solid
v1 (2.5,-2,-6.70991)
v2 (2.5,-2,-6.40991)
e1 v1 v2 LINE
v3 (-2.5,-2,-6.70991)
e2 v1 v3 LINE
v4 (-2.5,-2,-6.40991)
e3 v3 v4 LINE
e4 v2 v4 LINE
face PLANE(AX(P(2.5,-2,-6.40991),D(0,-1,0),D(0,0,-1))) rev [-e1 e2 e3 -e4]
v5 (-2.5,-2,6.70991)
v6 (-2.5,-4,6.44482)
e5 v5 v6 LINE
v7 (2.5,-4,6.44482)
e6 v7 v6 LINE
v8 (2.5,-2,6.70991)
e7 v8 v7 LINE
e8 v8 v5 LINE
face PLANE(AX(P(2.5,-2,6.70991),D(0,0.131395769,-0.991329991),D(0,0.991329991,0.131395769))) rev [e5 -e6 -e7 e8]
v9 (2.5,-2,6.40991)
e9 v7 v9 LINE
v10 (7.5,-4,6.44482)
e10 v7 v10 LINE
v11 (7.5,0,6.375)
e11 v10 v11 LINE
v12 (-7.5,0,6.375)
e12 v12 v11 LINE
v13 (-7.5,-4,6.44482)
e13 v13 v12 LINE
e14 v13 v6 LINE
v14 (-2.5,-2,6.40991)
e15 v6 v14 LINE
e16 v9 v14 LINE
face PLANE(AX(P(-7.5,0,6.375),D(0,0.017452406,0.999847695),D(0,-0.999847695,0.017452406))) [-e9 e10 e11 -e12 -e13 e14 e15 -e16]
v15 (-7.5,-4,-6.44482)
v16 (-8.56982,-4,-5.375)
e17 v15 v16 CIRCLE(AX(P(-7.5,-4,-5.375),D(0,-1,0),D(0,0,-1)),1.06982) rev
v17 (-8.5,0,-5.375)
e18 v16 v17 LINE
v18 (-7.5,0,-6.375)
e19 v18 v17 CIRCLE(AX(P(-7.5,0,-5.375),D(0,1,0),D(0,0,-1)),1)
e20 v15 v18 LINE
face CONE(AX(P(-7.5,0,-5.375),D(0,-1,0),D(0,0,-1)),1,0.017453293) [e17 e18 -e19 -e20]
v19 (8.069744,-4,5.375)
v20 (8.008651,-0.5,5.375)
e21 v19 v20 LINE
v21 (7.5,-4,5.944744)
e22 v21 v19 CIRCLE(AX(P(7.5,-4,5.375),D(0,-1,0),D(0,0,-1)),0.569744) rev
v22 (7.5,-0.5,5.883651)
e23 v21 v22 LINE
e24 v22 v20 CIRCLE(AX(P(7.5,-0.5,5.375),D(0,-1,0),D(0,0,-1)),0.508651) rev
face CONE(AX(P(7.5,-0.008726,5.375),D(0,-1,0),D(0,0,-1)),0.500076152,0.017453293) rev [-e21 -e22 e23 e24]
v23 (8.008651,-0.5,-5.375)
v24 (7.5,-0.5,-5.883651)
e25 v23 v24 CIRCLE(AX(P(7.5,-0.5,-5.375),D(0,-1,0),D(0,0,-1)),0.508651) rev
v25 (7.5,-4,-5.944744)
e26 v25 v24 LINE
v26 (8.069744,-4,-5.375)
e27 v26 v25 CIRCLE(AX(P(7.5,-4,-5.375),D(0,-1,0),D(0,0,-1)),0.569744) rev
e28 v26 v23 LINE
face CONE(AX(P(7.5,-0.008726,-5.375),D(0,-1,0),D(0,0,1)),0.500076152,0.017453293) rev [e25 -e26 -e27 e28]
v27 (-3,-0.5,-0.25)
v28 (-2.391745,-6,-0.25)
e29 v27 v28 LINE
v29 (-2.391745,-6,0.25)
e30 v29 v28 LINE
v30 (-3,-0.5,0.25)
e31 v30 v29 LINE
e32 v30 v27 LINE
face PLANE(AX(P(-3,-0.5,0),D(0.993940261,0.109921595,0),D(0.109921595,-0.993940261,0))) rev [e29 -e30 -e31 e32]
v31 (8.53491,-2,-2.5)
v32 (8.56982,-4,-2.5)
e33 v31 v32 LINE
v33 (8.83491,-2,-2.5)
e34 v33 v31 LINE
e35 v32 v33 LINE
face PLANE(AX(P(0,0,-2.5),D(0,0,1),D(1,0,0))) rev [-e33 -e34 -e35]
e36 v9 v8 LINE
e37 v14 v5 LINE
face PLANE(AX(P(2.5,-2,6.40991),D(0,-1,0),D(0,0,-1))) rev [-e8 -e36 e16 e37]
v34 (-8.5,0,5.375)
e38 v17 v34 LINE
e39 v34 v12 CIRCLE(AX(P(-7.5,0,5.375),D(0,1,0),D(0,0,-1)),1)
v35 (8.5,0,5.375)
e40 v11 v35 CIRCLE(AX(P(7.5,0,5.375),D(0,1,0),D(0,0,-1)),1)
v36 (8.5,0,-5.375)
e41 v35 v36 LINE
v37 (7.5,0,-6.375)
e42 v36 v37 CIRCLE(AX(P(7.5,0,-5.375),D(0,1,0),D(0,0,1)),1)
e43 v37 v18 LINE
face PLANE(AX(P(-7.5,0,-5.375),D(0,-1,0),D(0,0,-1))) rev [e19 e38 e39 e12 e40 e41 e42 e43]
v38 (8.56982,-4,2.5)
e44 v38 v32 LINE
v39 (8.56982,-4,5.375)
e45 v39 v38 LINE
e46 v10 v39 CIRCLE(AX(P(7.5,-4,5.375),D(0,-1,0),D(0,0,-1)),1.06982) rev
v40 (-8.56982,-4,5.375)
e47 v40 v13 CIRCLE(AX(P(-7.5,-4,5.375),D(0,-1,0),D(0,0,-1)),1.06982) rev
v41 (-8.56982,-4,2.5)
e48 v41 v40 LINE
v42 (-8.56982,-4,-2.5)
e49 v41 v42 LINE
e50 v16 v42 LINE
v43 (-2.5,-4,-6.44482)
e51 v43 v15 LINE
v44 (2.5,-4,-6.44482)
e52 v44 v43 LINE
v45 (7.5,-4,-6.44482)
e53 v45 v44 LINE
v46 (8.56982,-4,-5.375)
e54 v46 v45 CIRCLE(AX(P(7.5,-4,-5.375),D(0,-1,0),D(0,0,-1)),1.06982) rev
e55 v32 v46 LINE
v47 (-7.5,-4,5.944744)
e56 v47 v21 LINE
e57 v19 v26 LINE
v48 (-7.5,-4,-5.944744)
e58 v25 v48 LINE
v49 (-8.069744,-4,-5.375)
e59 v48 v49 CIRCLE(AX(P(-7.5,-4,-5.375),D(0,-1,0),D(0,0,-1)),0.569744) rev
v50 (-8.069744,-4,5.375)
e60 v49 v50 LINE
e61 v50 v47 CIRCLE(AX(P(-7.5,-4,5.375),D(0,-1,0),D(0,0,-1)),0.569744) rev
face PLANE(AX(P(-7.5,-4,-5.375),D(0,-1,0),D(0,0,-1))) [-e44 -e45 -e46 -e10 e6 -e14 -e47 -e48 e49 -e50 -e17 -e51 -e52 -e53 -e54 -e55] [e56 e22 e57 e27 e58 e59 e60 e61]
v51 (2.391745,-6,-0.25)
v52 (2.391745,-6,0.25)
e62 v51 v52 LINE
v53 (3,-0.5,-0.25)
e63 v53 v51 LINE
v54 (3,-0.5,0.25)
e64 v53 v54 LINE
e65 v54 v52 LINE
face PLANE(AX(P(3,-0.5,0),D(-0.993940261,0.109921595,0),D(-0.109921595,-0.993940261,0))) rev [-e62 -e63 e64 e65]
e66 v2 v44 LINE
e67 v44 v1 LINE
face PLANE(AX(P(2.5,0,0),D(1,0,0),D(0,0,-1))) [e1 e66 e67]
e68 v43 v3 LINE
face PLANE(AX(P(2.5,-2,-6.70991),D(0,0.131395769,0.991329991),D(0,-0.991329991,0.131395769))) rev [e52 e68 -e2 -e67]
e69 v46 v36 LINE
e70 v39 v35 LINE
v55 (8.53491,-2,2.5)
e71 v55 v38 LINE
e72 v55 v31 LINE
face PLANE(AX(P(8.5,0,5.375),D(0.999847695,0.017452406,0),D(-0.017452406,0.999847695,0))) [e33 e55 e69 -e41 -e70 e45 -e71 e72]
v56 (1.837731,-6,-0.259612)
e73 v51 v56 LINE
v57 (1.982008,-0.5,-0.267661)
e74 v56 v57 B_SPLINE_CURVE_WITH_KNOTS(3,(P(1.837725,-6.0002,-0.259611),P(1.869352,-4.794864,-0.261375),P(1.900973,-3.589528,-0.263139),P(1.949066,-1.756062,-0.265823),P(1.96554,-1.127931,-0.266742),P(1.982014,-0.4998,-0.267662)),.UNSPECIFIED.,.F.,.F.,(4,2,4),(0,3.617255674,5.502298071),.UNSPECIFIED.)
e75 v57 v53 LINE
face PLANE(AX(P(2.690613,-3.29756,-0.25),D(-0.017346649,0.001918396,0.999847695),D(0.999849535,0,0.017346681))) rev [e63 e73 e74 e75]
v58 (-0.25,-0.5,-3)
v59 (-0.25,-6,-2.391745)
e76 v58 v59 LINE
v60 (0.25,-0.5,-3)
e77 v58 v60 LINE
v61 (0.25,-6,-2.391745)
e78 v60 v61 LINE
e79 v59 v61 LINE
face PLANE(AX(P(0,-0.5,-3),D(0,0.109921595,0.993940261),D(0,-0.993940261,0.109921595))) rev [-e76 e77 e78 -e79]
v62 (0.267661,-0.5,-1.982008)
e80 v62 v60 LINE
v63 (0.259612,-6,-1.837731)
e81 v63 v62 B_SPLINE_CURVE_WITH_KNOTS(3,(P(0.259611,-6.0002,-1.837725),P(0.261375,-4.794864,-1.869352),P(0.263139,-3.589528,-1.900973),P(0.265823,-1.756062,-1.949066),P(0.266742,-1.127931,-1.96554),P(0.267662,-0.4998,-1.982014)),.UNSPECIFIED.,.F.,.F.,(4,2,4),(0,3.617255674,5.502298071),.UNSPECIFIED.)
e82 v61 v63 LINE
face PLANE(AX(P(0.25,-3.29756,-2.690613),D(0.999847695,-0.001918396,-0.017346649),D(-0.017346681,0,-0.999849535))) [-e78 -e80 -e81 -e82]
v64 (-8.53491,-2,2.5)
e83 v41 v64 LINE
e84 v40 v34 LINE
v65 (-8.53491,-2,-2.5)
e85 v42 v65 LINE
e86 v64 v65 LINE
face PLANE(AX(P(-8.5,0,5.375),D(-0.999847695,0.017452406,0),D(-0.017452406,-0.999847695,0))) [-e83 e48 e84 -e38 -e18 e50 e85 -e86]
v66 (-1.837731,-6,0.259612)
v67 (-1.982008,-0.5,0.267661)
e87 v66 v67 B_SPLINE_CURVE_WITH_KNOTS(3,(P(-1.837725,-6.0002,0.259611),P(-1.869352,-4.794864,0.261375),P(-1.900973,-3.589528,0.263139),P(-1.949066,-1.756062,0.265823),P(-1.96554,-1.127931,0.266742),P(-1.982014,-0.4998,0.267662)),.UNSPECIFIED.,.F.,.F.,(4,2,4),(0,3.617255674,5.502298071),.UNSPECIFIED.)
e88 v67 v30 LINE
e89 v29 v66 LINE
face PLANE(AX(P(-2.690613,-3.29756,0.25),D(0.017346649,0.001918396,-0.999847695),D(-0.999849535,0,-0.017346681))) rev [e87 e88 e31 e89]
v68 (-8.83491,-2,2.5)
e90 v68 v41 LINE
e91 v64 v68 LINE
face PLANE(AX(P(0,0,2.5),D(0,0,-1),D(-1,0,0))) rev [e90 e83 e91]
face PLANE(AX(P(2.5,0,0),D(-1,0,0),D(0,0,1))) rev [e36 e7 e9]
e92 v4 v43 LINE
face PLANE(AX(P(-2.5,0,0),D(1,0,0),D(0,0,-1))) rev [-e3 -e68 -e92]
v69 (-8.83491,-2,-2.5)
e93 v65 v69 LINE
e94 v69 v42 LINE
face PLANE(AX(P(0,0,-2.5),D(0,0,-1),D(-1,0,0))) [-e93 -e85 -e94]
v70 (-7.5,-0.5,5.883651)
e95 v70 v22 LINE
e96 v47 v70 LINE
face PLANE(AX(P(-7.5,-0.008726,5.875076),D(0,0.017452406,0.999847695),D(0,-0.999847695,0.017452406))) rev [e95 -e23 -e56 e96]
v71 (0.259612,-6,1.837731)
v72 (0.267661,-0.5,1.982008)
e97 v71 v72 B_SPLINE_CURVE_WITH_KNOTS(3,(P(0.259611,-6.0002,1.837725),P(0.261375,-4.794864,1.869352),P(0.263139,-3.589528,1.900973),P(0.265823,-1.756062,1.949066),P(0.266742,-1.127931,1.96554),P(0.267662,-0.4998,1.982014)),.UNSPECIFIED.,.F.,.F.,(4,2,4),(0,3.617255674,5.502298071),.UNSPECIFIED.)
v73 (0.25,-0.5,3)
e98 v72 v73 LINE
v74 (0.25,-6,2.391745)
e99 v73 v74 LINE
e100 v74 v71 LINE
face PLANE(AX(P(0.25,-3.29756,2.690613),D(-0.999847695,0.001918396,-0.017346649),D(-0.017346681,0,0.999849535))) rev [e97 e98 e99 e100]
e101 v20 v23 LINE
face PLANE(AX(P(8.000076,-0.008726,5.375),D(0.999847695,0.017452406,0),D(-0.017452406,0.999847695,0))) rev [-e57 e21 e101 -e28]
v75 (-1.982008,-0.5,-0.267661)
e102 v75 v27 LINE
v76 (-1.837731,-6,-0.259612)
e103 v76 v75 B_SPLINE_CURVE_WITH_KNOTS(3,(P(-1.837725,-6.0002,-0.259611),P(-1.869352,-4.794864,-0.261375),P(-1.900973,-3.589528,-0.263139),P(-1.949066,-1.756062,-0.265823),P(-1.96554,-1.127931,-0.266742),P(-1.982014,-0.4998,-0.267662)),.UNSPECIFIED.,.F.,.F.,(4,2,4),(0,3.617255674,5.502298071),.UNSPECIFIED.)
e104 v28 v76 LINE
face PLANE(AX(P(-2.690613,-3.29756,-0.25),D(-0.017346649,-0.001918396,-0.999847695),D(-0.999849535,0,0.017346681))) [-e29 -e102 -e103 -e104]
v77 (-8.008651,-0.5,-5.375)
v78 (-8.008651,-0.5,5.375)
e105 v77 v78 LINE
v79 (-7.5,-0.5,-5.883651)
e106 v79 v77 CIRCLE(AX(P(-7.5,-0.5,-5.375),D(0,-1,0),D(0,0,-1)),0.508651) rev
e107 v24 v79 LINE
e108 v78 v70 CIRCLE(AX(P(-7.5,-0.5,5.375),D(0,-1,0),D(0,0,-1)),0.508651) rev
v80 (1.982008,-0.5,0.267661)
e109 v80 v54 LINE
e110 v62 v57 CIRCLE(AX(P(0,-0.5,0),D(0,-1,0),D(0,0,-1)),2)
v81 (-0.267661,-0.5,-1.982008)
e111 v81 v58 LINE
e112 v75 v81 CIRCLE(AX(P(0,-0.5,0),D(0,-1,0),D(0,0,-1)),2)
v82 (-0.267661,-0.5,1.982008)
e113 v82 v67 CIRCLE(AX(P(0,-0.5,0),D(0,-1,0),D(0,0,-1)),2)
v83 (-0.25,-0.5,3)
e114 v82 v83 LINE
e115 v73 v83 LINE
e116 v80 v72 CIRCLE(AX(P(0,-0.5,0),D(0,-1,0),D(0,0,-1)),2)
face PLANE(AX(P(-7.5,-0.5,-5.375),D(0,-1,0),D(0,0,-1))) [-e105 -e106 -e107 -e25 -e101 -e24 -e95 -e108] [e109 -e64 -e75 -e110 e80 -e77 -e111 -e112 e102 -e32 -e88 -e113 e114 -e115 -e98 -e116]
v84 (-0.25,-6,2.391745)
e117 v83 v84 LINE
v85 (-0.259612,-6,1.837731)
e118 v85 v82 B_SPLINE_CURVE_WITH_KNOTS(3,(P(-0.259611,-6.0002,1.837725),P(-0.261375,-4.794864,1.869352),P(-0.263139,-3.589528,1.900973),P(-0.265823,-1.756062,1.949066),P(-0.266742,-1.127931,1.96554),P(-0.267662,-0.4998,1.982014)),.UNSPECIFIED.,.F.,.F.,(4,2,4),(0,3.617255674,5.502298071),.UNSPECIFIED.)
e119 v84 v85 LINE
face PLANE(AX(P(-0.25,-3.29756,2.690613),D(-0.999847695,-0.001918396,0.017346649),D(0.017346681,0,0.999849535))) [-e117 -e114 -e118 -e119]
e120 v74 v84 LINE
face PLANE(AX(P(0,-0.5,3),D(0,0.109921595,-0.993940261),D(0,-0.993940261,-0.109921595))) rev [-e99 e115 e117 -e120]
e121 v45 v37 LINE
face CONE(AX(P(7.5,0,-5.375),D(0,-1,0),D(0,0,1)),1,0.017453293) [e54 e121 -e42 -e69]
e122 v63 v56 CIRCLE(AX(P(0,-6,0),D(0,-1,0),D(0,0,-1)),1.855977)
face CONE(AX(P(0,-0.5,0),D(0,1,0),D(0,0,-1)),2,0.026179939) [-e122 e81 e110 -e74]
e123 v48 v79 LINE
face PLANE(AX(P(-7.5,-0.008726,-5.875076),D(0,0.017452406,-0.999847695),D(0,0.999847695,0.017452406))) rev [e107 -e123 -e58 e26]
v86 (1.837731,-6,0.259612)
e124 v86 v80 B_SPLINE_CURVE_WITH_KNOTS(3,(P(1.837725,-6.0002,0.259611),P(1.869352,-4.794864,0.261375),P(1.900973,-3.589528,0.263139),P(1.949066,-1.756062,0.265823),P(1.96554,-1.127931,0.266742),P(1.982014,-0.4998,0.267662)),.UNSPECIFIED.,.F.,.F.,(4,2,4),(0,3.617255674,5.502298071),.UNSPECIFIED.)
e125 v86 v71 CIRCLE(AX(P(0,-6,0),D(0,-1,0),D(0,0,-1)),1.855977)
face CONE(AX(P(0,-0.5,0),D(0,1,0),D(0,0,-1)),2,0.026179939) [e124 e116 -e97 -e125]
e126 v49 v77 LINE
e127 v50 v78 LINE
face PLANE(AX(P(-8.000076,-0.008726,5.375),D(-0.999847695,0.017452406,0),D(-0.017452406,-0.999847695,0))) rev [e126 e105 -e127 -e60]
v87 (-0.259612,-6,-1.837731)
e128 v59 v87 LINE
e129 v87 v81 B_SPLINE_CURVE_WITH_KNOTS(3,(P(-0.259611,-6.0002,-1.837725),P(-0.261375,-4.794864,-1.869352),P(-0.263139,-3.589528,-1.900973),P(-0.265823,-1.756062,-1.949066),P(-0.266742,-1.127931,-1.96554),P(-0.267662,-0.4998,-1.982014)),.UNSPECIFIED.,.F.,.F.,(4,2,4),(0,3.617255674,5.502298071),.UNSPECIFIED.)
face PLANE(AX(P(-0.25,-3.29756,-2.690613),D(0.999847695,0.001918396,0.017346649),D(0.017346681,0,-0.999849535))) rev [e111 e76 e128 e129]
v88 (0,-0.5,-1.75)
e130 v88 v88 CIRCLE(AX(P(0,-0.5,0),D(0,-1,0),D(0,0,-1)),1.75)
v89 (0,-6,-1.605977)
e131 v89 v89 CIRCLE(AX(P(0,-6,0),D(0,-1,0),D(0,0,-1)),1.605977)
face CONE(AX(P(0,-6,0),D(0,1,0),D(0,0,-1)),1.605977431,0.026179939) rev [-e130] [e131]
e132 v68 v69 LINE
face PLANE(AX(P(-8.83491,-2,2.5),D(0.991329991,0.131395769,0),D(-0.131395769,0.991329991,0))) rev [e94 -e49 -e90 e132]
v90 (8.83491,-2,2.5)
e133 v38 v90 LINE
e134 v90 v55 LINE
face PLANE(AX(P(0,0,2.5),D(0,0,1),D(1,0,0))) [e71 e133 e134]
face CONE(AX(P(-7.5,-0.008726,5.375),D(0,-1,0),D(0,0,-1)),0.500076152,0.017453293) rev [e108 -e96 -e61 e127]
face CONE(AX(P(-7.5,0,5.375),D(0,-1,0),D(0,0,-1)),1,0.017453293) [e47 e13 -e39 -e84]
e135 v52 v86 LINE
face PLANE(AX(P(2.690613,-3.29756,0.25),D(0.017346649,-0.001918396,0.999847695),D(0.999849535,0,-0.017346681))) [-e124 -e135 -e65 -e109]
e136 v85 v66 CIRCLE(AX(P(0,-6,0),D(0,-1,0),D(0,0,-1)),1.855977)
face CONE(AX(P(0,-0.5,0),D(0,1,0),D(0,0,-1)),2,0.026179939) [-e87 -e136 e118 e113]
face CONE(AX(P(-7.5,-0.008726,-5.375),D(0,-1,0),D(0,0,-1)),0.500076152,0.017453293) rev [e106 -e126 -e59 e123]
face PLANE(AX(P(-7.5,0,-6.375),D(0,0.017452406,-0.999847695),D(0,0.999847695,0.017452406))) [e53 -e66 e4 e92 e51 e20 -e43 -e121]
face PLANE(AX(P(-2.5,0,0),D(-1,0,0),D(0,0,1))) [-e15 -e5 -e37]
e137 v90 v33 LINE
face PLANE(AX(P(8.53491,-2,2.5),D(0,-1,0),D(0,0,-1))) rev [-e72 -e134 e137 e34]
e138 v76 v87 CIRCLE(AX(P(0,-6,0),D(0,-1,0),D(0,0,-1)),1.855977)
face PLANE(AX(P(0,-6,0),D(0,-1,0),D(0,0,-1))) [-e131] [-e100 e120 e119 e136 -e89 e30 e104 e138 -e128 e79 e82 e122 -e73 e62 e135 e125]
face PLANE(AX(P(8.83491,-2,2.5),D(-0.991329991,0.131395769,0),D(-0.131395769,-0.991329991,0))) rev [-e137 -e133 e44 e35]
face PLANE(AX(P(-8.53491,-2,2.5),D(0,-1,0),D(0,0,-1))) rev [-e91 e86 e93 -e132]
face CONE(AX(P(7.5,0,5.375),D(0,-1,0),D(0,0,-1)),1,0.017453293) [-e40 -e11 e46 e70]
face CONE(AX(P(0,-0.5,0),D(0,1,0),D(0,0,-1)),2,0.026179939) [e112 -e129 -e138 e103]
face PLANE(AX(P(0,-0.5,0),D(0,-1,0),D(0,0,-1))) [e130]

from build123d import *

# Parameters (mm, degrees)
BOSS_EXTRUDE1_DEPTH = 4
BOSS_EXTRUDE1_DRAFT = 1
SHELL1_T            = -0.5
SKETCH2_R           = 2
BOSS_EXTRUDE2_DEPTH = 5.5
BOSS_EXTRUDE2_TAPER = 1.5
CIRPATTERN1_COUNT   = 4
SKETCH4_R           = 1.605977431
CUT_EXTRUDE1_DEPTH  = 5.5
CUT_EXTRUDE1_DRAFT  = 1.5
BOSS_EXTRUDE3_DEPTH = 2.5
BOSS_EXTRUDE4_DEPTH = 2.5


with BuildPart() as part:
    # Sketch1 → Boss-Extrude1 (with draft: the straight prism first)
    with BuildSketch(Plane(origin=(0, 0, 0), x_dir=(1, 0, 0), z_dir=(0, 1, 0))):
        with BuildLine():
            Line((-7.5, -6.375), (7.5, -6.375))
            ThreePointArc((7.5, -6.375), (8.207106781, -6.082106781), (8.5, -5.375))
            Line((8.5, -5.375), (8.5, 5.375))
            ThreePointArc((8.5, 5.375), (8.207106781, 6.082106781), (7.5, 6.375))
            Line((7.5, 6.375), (-7.5, 6.375))
            ThreePointArc((-7.5, 6.375), (-8.207106781, 6.082106781), (-8.5, 5.375))
            Line((-8.5, 5.375), (-8.5, -5.375))
            ThreePointArc((-8.5, -5.375), (-8.207106781, -6.082106781), (-7.5, -6.375))
        make_face()
    extrude(amount=-BOSS_EXTRUDE1_DEPTH)
    # Boss-Extrude1: the draft: its side faces are tilted about the plane it starts from
    boss_extrude1_sides = [part.faces().sort_by_distance(p)[0] for p in [
        (0, -2, 6.375),
        (8.207106781, -2, 6.082106781),
        (8.5, -2, 0),
        (8.207106781, -2, -6.082106781),
        (0, -2, -6.375),
        (-8.207106781, -2, -6.082106781),
        (-8.5, -2, 0),
        (-8.207106781, -2, 6.082106781),
    ]]
    draft(boss_extrude1_sides, Plane(origin=(0, 0, 0), x_dir=(1, 0, 0), z_dir=(0, 1, 0)), BOSS_EXTRUDE1_DRAFT)

    # Shell1
    shell1_openings = [part.faces().sort_by_distance(p)[0] for p in [
        (0, -4, 0),
    ]]
    offset(amount=SHELL1_T, openings=shell1_openings, kind=Kind.INTERSECTION)

    # Sketch2 → Boss-Extrude2 (add)
    with BuildSketch(Plane.XZ.offset(0.5)):
        Circle(SKETCH2_R)
    extrude(amount=BOSS_EXTRUDE2_DEPTH, taper=BOSS_EXTRUDE2_TAPER)

    # Rib1: read off the stored shape, not the designer's step
    # Rib1: loft between two sections, ruled curve by curve
    rib1_from = [
        Edge.make_line((1.982008415, -0.5, 0.267661433), (3, -0.5, 0.25)),
        Edge.make_line((1.982008415, -0.5, -0.267661433), (3, -0.5, -0.25)),
        Edge.make_line((3, -0.5, -0.25), (3, -0.5, 0.25)),
        Edge.make_line((1.982008415, -0.5, -0.267661433), (1.982008415, -0.5, 0.267661433)),
    ]
    rib1_to = [
        Edge.make_line((1.837730654, -6, 0.259611763), (2.391745366, -6, 0.25)),
        Edge.make_line((1.837730654, -6, -0.259611763), (2.391745366, -6, -0.25)),
        Edge.make_line((2.391745366, -6, -0.25), (2.391745366, -6, 0.25)),
        Edge.make_line((1.837730654, -6, -0.259611763), (1.837730654, -6, 0.259611763)),
    ]
    rib1 = Solid(Shell([*[Face.make_surface_from_curves(rib1_from[k], rib1_to[k]) for k in range(4)], Face(Wire(rib1_from)), Face(Wire(rib1_to))]))
    add(rib1)

    # CirPattern1: Rib1 ×4 about axis
    cirpattern1_axis = Axis((0, 0, 0), (0, 1, 0))
    for i in range(1, CIRPATTERN1_COUNT):
        add(rib1.rotate(cirpattern1_axis, i * 360 / CIRPATTERN1_COUNT))


with BuildPart() as cut_extrude1_tool:
    # Sketch4 → Cut-Extrude1 (with draft: the straight prism first)
    with BuildSketch(Plane.XZ.offset(6)):
        Circle(SKETCH4_R)
    extrude(amount=-CUT_EXTRUDE1_DEPTH)
    # Cut-Extrude1: the draft: its side faces are tilted about the plane it starts from
    cut_extrude1_sides = [cut_extrude1_tool.faces().sort_by_distance(p)[0] for p in [
        (-1.605977431, -3.25, 0),
    ]]
    draft(cut_extrude1_sides, Plane.XZ.offset(6), CUT_EXTRUDE1_DRAFT)


with BuildPart() as part_1:
    add(part.part)

    # Cut-Extrude1: cut by cut_extrude1_tool
    add(cut_extrude1_tool.part, mode=Mode.SUBTRACT)

    # Sketch5 → Boss-Extrude3 (add, symmetric)
    with BuildSketch(Plane(origin=(0, 0, 0), x_dir=(0, 0, -1), z_dir=(1, 0, 0))):
        Polygon((6.44482026, -4), (6.40991013, -2), (6.70991013, -2), align=None)
        Polygon((-6.70991013, -2), (-6.44482026, -4), (-6.40991013, -2), align=None)
    extrude(amount=BOSS_EXTRUDE3_DEPTH, both=True)

    # Sketch6 → Boss-Extrude4 (add, symmetric)
    with BuildSketch(Plane.XY):
        Polygon((8.56982026, -4), (8.53491013, -2), (8.83491013, -2), align=None)
        Polygon((-8.83491013, -2), (-8.56982026, -4), (-8.53491013, -2), align=None)
    extrude(amount=BOSS_EXTRUDE4_DEPTH, both=True)


solid = part_1.part
